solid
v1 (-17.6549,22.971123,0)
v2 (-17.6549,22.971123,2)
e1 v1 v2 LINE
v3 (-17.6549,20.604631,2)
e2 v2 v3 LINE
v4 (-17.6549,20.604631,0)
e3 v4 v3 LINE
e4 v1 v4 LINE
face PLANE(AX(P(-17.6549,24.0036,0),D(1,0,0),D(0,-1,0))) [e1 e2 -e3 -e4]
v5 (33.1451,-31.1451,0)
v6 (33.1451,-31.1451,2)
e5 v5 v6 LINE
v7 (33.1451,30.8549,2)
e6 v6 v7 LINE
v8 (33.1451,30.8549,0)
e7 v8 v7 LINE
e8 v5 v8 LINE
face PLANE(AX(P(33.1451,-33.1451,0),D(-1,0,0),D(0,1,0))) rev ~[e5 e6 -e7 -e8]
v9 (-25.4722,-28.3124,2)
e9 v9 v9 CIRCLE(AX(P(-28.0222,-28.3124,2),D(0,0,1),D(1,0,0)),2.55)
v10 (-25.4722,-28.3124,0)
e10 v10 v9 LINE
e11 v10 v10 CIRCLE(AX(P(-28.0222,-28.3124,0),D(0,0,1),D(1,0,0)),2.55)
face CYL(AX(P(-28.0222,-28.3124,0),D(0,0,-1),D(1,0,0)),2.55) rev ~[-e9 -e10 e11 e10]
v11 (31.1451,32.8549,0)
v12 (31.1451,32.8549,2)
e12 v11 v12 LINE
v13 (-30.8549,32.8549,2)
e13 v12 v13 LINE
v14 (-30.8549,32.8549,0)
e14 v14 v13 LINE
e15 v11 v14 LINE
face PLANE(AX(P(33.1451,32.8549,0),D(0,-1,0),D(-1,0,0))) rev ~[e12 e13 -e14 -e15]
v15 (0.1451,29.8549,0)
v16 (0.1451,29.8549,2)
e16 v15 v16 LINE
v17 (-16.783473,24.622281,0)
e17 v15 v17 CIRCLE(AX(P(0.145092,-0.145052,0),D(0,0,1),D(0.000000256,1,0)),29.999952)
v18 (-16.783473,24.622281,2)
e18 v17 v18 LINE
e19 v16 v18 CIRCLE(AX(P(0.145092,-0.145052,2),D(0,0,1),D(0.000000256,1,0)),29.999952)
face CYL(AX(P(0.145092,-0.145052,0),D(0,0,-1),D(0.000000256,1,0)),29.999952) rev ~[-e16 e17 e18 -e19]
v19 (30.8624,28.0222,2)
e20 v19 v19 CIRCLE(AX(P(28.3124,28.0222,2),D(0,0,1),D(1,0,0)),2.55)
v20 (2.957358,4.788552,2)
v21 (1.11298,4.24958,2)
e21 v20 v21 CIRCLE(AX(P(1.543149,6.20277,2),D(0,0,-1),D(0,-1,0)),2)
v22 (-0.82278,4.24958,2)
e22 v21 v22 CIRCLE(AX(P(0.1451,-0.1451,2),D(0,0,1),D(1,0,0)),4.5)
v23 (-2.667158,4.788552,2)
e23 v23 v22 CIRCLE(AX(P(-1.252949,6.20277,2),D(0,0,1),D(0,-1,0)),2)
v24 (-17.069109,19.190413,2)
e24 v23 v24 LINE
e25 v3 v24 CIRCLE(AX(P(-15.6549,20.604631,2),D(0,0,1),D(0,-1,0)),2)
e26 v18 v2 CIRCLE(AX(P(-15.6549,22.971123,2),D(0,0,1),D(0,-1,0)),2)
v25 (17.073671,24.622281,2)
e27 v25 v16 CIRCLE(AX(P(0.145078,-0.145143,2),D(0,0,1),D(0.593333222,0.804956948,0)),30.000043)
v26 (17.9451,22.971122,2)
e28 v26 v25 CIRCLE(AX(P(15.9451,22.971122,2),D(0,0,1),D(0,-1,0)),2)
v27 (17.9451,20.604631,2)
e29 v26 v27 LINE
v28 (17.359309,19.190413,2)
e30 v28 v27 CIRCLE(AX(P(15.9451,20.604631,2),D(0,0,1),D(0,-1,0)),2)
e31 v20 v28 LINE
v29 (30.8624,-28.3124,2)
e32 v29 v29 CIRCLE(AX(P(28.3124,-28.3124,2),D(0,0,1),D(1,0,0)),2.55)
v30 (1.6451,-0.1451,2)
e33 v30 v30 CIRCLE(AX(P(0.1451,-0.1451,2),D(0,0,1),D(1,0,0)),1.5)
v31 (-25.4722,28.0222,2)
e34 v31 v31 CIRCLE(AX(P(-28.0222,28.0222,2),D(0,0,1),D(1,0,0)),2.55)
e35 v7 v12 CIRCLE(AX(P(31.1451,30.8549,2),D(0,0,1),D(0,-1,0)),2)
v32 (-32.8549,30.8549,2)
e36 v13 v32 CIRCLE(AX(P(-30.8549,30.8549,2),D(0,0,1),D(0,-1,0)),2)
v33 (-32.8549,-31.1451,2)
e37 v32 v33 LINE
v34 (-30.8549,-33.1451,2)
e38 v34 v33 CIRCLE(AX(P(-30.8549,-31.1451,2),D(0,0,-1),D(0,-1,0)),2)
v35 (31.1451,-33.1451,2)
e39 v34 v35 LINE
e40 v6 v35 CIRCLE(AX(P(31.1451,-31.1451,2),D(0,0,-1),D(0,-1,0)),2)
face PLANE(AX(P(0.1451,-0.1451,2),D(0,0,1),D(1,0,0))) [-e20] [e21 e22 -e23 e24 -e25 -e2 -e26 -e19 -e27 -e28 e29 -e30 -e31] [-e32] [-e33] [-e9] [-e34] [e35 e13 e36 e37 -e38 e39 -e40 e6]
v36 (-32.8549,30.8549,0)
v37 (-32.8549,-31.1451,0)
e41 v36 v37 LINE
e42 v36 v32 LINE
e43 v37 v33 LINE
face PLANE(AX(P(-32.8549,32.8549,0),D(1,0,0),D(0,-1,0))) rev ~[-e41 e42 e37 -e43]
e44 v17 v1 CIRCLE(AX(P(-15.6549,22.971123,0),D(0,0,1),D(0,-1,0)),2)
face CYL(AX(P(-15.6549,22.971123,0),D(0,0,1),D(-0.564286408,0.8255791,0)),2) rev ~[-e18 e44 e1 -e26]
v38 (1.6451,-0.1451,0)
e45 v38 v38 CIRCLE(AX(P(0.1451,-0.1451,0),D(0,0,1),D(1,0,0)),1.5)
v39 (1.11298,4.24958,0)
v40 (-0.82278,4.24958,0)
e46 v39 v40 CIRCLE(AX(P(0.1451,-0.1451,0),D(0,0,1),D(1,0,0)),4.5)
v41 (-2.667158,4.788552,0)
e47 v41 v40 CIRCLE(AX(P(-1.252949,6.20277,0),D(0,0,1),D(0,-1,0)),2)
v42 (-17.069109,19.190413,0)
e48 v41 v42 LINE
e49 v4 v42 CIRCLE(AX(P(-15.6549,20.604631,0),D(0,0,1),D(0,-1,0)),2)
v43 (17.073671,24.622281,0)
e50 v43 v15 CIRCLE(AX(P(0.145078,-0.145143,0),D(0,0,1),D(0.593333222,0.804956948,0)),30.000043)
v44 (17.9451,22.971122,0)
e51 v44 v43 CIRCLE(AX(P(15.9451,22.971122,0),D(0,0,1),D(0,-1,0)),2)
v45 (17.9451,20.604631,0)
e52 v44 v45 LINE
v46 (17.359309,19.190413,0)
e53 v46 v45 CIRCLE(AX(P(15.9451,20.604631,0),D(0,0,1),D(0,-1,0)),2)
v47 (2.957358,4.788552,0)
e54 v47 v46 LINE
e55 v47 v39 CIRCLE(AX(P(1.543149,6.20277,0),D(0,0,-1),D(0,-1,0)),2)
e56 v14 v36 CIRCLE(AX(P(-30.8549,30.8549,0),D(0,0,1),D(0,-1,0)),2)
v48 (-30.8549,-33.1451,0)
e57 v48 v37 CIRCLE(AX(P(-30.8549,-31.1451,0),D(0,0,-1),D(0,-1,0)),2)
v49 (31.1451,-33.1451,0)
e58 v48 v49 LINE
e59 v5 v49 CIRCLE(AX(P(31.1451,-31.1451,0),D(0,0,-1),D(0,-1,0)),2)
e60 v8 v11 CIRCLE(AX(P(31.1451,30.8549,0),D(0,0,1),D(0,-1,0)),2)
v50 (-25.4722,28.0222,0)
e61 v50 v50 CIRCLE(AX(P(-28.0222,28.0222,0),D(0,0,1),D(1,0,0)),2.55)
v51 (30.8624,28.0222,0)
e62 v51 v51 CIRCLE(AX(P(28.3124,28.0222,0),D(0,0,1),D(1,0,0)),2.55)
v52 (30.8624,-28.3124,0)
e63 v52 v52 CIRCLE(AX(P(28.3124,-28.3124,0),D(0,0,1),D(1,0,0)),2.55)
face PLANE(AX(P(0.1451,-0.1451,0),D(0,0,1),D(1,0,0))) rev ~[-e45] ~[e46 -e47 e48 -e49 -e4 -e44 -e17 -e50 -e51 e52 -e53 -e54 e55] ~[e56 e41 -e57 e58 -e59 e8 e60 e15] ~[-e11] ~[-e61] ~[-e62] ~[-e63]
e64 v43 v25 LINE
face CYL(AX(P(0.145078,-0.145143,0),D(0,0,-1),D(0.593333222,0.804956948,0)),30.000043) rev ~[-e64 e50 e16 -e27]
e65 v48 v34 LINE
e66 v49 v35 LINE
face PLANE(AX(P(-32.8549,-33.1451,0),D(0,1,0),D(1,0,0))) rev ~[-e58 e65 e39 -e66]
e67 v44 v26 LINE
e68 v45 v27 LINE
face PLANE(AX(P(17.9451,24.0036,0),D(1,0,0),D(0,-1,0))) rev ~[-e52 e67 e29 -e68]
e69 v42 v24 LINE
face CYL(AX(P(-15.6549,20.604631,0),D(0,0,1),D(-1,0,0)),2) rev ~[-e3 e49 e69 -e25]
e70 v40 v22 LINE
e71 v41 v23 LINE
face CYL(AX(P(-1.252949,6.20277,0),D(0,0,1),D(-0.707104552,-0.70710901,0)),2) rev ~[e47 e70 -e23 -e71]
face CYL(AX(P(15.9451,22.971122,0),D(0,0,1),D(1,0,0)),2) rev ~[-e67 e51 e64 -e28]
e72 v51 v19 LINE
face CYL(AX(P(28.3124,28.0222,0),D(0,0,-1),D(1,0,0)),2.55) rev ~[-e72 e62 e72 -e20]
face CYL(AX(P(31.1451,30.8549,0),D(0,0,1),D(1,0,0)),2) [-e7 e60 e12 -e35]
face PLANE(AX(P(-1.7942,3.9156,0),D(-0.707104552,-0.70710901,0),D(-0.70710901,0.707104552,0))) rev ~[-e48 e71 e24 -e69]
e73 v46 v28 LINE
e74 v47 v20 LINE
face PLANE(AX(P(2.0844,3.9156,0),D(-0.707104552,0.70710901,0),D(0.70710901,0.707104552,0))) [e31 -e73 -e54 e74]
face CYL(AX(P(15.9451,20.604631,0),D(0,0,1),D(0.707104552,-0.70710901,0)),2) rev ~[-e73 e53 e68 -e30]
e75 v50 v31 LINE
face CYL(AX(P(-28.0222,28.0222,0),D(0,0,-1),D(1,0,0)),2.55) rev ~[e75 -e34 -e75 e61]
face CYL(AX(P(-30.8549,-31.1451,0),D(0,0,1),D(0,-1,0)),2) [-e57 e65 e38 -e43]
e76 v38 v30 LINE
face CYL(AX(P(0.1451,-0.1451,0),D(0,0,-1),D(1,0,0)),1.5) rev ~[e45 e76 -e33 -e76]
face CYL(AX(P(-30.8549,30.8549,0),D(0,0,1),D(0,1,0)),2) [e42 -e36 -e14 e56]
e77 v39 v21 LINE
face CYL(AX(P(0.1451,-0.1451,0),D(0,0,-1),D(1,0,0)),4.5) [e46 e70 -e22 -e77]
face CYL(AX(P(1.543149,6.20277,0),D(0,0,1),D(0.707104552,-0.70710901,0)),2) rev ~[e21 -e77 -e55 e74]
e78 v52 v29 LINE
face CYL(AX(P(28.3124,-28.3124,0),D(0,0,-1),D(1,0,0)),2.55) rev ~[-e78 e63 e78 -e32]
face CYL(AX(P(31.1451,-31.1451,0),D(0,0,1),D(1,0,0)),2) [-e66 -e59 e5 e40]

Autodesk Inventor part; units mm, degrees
ref_plane "YZ Plane" through (0, 0, 0) normal (1, 0, 0) x (0, 1, 0)
ref_plane "XZ Plane" through (0, 0, 0) normal (0, 1, 0) x (-1, 0, 0)
ref_plane "XY Plane" through (0, 0, 0) normal (0, 0, 1) x (1, 0, 0)
sketch "Sketch1" plane through (0.1451, -0.1451, 0) normal (0, 0, 1) x (1, 0, 0)
  arc A0 (20.126, -22.2473) -> (-20.126, -22.2473) centre (0, 0) ccw construction
  circle A1 centre (0, 0) radius 33 construction
  line L0 (33, 33) -> (-33, 33)
  line L1 (-33, 33) -> (-33, -33)
  line L2 (-33, -33) -> (33, -33)
  line L3 (33, -33) -> (33, 33)
  line L4 (33, 33) -> (23.3345, 23.3345) construction
  line L5 (-33, 33) -> (-23.3345, 23.3345) construction
  line L6 (23.3345, 23.3345) -> (-23.3345, -23.3345) construction
  line L7 (23.3345, -23.3345) -> (33, -33) construction
  line L8 (-23.3345, -23.3345) -> (-33, -33) construction
  line L9 (-23.3345, 23.3345) -> (23.3345, -23.3345) construction
  line L10 (0, -33) -> (0, 33) construction
  line L11 (33, 0) -> (-33, 0) construction
  circle A2 centre (0, 0) radius 1.5
  circle A3 centre (0, 0) radius 4.5
  line L12 (4.0607, -1.9393) -> (22.2473, -20.126) construction
  line L13 (1.9393, -4.0607) -> (17.8, -19.9213) construction
  arc A4 (0, -30) -> (17.8, -24.1487) centre (0, 0) ccw construction
  line L14 (-1.9393, -4.0607) -> (-17.8, -19.9213) construction
  line L15 (-4.0607, -1.9393) -> (-22.2473, -20.126) construction
  line L16 (23.3345, 23.3345) -> (-23.3345, -23.3345) construction
  arc A5 (-20.126, -22.2473) -> (-17.8, -24.1487) centre (0, 0) ccw construction
  line L17 (17.8, -24.1487) -> (17.8, -19.9213) construction
  line L18 (-17.8, -24.1487) -> (-17.8, -19.9213) construction
  line L19 (17.8, -22.035) -> (-17.8, -22.035) construction
  arc A6 (-17.8, -24.1487) -> (0, -30) centre (0, 0) ccw construction
  line L20 (-17.8, -19.9213) -> (-20.126, -22.2473) construction
  line L21 (17.8, -19.9213) -> (20.126, -22.2473) construction
  arc A7 (17.8, -24.1487) -> (20.126, -22.2473) centre (0, 0) ccw construction
  line L22 (17.8, 19.9213) -> (20.126, 22.2473) construction
  arc A8 (20.126, 22.2473) -> (17.8, 24.1487) centre (0, 0) ccw construction
  arc A9 (-17.8, 24.1487) -> (-20.126, 22.2473) centre (0, 0) ccw construction
  line L23 (-17.8, 19.9213) -> (-20.126, 22.2473) construction
  line L24 (-1.9393, 4.0607) -> (-17.8, 19.9213)
  line L25 (1.9393, 4.0607) -> (17.8, 19.9213)
  line L26 (17.8, 24.1487) -> (17.8, 19.9213)
  arc A10 (17.8, 24.1487) -> (0, 30) centre (0, 0) ccw
  arc A11 (0, 30) -> (-17.8, 24.1487) centre (0, 0) ccw
  line L27 (-17.8, 24.1487) -> (-17.8, 19.9213)
  circle A12 centre (28.1673, -28.1673) radius 2.55
  circle A13 centre (-28.1673, -28.1673) radius 2.55
  circle A14 centre (-28.1673, 28.1673) radius 2.55
  circle A15 centre (28.1673, 28.1673) radius 2.55
  point P0 (0, -22.035)
  dimension "d17" = 60
  dimension "d18" = 3
  dimension "d19" = 3
  dimension "d20" = 3
  dimension "d21" = 1.5
  dimension "d22" = 3
  dimension "d23" = 35.6
  dimension "d24" = 5.1
  dimension "d25" = 5.1
  dimension "d26" = 5.1
  dimension "d27" = 5.1
extrude "Extrusion1" add sketch "Sketch1" along normal blind 2 contours L3 L2 L1 L0 | A3
fillet "Fillet3" radius 2 10 edges at (17.9451, 24.0036, 1) (17.9451, 19.7762, 1) (33.1451, 32.8549, 1) (-32.8549, 32.8549, 1) (2.0845, 3.9155, 1) (-1.7942, 3.9155, 1) (-17.6549, 24.0036, 1) (-17.6549, 19.7762, 1) (33.1451, -33.1451, 1) (-32.8549, -33.1451, 1)
ref_plane "Work Plane4" through (-30.8549, -0.1451, 0) normal (0, -1, 0) x (1, 0, 0)
ref_plane "Work Plane5" through (0.1451, -31.1451, 0) normal (1, 0, 0) x (0, 0, -1)
properties part number "Feeder Top Plate" material "Aluminum 6061"
